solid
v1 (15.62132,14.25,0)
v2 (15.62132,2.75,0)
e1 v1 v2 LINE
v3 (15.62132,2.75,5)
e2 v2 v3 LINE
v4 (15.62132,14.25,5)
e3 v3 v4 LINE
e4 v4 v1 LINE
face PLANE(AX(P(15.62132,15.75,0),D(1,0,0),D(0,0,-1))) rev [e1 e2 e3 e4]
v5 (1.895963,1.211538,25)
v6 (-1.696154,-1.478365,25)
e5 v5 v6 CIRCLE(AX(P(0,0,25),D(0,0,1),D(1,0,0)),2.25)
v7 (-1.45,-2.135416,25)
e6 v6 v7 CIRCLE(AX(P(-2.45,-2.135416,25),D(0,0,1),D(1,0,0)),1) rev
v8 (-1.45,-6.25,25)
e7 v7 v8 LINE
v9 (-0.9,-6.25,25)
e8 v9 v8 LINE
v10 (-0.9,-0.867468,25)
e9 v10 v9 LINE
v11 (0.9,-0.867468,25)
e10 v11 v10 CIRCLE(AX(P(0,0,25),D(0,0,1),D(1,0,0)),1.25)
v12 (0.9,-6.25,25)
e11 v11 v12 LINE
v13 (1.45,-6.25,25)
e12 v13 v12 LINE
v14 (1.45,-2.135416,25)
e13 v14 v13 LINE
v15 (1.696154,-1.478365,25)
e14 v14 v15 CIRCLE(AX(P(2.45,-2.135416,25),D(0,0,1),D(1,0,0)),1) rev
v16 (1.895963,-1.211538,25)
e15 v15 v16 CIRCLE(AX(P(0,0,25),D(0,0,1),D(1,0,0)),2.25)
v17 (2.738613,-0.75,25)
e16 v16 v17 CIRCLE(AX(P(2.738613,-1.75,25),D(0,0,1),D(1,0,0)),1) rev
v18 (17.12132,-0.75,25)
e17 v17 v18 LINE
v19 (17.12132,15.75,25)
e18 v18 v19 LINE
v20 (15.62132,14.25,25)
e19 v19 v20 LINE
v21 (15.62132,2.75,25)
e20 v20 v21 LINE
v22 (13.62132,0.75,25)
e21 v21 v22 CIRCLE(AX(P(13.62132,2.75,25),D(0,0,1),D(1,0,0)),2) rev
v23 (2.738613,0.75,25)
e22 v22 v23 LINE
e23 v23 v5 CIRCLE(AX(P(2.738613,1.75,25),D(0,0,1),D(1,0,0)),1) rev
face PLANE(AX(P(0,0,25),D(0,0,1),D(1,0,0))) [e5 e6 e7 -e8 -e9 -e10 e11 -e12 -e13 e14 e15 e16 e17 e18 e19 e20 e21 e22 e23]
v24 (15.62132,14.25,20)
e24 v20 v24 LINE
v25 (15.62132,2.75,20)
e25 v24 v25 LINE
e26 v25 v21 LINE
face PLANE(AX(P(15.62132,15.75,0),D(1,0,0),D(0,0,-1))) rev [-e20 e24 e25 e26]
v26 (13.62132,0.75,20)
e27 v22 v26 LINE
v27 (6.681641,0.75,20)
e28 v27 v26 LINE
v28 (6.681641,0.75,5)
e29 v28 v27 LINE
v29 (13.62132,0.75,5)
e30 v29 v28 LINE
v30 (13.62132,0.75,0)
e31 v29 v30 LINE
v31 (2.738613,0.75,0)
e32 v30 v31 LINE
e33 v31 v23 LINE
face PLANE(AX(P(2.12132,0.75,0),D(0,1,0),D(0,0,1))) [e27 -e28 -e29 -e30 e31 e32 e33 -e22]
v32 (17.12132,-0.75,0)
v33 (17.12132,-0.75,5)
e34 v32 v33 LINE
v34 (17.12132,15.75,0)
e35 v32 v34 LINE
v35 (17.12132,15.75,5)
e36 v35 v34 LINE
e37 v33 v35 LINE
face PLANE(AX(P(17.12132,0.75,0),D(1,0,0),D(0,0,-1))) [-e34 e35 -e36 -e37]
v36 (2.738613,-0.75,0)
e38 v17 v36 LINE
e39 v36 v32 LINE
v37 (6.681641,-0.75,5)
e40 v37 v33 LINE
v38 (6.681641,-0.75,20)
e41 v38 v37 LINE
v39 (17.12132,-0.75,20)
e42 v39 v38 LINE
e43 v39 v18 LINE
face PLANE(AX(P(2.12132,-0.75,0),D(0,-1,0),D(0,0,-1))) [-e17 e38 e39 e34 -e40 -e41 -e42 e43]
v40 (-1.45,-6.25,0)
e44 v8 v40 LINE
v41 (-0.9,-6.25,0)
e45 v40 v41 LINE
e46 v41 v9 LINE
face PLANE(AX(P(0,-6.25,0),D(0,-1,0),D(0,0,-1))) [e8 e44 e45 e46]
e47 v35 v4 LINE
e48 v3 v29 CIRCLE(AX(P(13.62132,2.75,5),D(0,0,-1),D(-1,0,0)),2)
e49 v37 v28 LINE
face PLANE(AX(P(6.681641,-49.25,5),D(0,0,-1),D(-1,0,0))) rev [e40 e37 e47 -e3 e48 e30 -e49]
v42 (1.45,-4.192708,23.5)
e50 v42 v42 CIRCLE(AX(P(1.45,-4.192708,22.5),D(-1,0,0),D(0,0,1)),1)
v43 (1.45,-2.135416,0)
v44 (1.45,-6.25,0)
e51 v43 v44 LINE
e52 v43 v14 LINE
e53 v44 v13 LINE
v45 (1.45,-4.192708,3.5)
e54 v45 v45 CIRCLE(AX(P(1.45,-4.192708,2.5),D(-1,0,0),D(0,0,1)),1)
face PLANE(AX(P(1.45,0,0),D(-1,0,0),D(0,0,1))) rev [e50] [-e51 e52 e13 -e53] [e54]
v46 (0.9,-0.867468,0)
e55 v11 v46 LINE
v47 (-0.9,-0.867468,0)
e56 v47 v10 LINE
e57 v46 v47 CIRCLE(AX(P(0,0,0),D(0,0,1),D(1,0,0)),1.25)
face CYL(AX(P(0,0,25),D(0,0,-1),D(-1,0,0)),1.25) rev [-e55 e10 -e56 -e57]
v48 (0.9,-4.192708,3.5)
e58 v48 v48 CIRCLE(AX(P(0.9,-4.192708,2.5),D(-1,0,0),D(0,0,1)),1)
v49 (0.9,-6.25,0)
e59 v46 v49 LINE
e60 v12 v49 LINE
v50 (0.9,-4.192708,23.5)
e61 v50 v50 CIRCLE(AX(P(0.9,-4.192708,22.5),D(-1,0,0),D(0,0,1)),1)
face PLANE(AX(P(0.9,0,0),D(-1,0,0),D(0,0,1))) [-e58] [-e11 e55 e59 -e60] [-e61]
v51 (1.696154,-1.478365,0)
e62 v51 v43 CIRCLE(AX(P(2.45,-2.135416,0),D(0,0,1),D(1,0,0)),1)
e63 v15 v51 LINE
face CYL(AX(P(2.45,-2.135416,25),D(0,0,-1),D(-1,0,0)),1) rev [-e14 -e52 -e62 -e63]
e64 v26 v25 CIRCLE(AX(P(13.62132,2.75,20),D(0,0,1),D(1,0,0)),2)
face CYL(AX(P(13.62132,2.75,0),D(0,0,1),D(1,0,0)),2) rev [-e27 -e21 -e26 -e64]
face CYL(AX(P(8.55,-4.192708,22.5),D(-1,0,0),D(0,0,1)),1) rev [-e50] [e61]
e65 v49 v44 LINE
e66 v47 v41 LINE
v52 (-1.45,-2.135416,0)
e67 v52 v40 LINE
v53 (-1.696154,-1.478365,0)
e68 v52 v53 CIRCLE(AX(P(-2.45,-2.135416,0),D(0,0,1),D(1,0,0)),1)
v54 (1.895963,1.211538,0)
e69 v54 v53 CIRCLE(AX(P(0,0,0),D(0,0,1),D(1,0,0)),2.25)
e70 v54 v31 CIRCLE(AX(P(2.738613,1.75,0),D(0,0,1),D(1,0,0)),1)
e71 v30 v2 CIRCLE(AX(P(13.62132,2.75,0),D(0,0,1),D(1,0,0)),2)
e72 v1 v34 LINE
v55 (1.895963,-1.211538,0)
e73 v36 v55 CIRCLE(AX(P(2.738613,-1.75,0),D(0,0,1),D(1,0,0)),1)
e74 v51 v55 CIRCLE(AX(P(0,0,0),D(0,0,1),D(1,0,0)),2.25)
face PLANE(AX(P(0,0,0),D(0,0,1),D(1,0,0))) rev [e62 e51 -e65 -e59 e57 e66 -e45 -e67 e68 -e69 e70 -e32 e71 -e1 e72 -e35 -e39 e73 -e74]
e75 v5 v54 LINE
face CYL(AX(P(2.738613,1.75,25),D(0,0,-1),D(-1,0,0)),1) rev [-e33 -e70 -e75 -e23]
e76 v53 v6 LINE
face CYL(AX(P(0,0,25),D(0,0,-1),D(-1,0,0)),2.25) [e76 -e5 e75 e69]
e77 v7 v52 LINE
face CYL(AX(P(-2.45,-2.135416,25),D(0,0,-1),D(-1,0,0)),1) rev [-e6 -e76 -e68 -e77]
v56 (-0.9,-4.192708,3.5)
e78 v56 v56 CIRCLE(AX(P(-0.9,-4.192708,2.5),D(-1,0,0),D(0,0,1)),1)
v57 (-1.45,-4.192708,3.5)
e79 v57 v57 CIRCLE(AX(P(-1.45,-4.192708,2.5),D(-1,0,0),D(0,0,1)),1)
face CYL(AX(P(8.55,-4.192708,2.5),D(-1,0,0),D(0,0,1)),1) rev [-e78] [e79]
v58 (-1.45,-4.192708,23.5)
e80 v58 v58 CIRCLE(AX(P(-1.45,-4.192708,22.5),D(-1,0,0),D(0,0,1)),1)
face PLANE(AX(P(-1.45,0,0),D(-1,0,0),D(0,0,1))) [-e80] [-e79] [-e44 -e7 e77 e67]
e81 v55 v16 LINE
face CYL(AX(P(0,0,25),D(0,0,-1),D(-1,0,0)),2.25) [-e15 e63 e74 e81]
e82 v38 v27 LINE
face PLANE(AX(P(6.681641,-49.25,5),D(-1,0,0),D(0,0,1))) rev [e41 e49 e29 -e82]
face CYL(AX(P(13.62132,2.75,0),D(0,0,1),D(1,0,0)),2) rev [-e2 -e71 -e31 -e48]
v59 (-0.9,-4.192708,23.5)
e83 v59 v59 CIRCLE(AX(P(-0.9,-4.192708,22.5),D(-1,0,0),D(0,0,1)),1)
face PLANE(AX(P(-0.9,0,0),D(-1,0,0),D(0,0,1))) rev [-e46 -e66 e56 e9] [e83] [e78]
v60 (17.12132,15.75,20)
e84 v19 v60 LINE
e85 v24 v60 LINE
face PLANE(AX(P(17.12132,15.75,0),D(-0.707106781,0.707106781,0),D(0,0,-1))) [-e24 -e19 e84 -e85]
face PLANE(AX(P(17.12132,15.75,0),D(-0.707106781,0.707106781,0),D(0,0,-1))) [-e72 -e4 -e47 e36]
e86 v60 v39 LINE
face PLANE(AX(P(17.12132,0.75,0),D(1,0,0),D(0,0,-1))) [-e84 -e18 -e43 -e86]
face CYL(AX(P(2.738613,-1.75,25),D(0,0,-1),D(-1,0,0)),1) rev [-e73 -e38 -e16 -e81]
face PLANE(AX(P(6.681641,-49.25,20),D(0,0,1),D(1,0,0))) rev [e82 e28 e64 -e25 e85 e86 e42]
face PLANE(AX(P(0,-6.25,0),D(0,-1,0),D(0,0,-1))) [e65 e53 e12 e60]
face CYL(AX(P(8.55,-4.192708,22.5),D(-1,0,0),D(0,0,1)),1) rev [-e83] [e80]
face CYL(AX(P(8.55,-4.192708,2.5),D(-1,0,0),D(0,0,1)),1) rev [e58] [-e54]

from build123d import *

# Parameters (mm, degrees)
SKETCH_1_R          = 2.25
SKETCH_1_R_2        = 1.25
EXTRUDE_1_DEPTH     = 25
EXTRUDE_START       = -25
EXTRUDE_2_DEPTH     = 25
CUT_EXTRUDE_1_DEPTH = 25
SKETCH_4_W          = 0.55
SKETCH_4_H          = 25
EXTRUDE_3_DEPTH     = 2
EXTRUDE_4_DEPTH     = 25
FILLET_1_R          = 1
SKETCH_6_W          = 1.5
SKETCH_6_H          = 25
EXTRUDE_6_DEPTH     = 15
SKETCH_7_W          = 17.879358453
SKETCH_7_H          = 15
CUT_EXTRUDE_2_DEPTH = 50
FILLET_2_R          = 2
SKETCH_8_R          = 1
CUT_EXTRUDE_3_DEPTH = 10
CHAMFER_1_SIZE      = 1.5


with BuildPart() as part:
    # 草图1 → 凸台-拉伸1 (new body)
    with BuildSketch(Plane.XY):
        Circle(SKETCH_1_R)
        Circle(SKETCH_1_R_2, mode=Mode.SUBTRACT)
    extrude(amount=EXTRUDE_1_DEPTH)

    # 草图2 → 凸台-拉伸2 (add)
    with BuildSketch(Plane.XY.offset(25).offset(EXTRUDE_START)):
        with BuildLine():
            Line((-0.9, -4.25), (-0.9, -2.062159063))
            ThreePointArc((-0.9, -2.062159063), (-1.187355759, -1.911200225), (-1.45, -1.720465053))
            Line((-1.45, -1.720465053), (-1.45, -4.25))
            Line((-1.45, -4.25), (-0.9, -4.25))
        make_face()
        with BuildLine():
            ThreePointArc((1.45, -1.720465053), (1.187355759, -1.911200225), (0.9, -2.062159063))
            Line((0.9, -2.062159063), (0.9, -4.25))
            Line((0.9, -4.25), (1.45, -4.25))
            Line((1.45, -4.25), (1.45, -1.720465053))
        make_face()
    extrude(amount=EXTRUDE_2_DEPTH)

    # 草图3 → 切除-拉伸1 (cut)
    with BuildSketch(Plane.XY.offset(25)):
        Polygon((-0.9, -2.062159063), (-0.9, -0.608172981), (0.9, -0.572608175), (0.9, -2.062159063), (-0.22034315, -2.711539451), align=None)
    extrude(amount=-CUT_EXTRUDE_1_DEPTH, mode=Mode.SUBTRACT)

    # 草图4 → 凸台-拉伸3 (add)
    with BuildSketch(Plane.XZ.offset(4.25)):
        with Locations((1.175, 12.5)):
            Rectangle(SKETCH_4_W, SKETCH_4_H)
        with Locations((-1.175, 12.5)):
            Rectangle(SKETCH_4_W, SKETCH_4_H)
    extrude(amount=EXTRUDE_3_DEPTH)

    # 草图5 → 凸台-拉伸4 (add)
    with BuildSketch(Plane.XY.offset(25).offset(EXTRUDE_START)):
        with BuildLine():
            Line((2.121320344, 0.75), (17.121320344, 0.75))
            Line((17.121320344, 0.75), (17.121320344, -0.75))
            Line((17.121320344, -0.75), (2.121320344, -0.75))
            ThreePointArc((2.121320344, -0.75), (2.25, 0), (2.121320344, 0.75))
        make_face()
    extrude(amount=EXTRUDE_4_DEPTH)

    # 圆角1
    fillet_1_edges = [part.edges().sort_by_distance(p)[0] for p in [
        (-1.45, -1.720465053, 12.5),
        (1.45, -1.720465053, 12.5),
        (2.121320344, -0.75, 12.5),
        (2.121320344, 0.75, 12.5),
    ]]
    fillet(fillet_1_edges, radius=FILLET_1_R)

    # 草图6 → 凸台-拉伸6 (add)
    with BuildSketch(Plane(origin=(0, 0.75, 0), x_dir=(1, 0, 0), z_dir=(0, 1, 0))):
        with Locations((16.371320344, -12.5)):
            Rectangle(SKETCH_6_W, SKETCH_6_H)
    extrude(amount=EXTRUDE_6_DEPTH)

    # 草图7 → 切除-拉伸2 (cut, symmetric)
    with BuildSketch(Plane(origin=(0, 0.75, 0), x_dir=(1, 0, 0), z_dir=(0, 1, 0))):
        with Locations((15.621320344, -12.5)):
            Rectangle(SKETCH_7_W, SKETCH_7_H)
    extrude(amount=CUT_EXTRUDE_2_DEPTH, both=True, mode=Mode.SUBTRACT)

    # 圆角2
    fillet_2_edges = [part.edges().sort_by_distance(p)[0] for p in [
        (15.621320344, 0.75, 2.5),
        (15.621320344, 0.75, 22.5),
    ]]
    fillet(fillet_2_edges, radius=FILLET_2_R)

    # 草图8 → 切除-拉伸3 (cut)
    with BuildSketch(Plane.ZY.offset(1.45)):
        with Locations((2.5, -4.192707825)):
            Circle(SKETCH_8_R)
        with Locations((22.5, -4.192707825)):
            Circle(SKETCH_8_R)
    extrude(amount=-CUT_EXTRUDE_3_DEPTH, mode=Mode.SUBTRACT)

    # 倒角1
    chamfer_1_edges = [part.edges().sort_by_distance(p)[0] for p in [
        (15.621320344, 15.75, 2.5),
        (15.621320344, 15.75, 22.5),
    ]]
    chamfer(chamfer_1_edges, length=CHAMFER_1_SIZE - 0.0001)  # a hair under: the kernel refuses the full size


solid = part.part
